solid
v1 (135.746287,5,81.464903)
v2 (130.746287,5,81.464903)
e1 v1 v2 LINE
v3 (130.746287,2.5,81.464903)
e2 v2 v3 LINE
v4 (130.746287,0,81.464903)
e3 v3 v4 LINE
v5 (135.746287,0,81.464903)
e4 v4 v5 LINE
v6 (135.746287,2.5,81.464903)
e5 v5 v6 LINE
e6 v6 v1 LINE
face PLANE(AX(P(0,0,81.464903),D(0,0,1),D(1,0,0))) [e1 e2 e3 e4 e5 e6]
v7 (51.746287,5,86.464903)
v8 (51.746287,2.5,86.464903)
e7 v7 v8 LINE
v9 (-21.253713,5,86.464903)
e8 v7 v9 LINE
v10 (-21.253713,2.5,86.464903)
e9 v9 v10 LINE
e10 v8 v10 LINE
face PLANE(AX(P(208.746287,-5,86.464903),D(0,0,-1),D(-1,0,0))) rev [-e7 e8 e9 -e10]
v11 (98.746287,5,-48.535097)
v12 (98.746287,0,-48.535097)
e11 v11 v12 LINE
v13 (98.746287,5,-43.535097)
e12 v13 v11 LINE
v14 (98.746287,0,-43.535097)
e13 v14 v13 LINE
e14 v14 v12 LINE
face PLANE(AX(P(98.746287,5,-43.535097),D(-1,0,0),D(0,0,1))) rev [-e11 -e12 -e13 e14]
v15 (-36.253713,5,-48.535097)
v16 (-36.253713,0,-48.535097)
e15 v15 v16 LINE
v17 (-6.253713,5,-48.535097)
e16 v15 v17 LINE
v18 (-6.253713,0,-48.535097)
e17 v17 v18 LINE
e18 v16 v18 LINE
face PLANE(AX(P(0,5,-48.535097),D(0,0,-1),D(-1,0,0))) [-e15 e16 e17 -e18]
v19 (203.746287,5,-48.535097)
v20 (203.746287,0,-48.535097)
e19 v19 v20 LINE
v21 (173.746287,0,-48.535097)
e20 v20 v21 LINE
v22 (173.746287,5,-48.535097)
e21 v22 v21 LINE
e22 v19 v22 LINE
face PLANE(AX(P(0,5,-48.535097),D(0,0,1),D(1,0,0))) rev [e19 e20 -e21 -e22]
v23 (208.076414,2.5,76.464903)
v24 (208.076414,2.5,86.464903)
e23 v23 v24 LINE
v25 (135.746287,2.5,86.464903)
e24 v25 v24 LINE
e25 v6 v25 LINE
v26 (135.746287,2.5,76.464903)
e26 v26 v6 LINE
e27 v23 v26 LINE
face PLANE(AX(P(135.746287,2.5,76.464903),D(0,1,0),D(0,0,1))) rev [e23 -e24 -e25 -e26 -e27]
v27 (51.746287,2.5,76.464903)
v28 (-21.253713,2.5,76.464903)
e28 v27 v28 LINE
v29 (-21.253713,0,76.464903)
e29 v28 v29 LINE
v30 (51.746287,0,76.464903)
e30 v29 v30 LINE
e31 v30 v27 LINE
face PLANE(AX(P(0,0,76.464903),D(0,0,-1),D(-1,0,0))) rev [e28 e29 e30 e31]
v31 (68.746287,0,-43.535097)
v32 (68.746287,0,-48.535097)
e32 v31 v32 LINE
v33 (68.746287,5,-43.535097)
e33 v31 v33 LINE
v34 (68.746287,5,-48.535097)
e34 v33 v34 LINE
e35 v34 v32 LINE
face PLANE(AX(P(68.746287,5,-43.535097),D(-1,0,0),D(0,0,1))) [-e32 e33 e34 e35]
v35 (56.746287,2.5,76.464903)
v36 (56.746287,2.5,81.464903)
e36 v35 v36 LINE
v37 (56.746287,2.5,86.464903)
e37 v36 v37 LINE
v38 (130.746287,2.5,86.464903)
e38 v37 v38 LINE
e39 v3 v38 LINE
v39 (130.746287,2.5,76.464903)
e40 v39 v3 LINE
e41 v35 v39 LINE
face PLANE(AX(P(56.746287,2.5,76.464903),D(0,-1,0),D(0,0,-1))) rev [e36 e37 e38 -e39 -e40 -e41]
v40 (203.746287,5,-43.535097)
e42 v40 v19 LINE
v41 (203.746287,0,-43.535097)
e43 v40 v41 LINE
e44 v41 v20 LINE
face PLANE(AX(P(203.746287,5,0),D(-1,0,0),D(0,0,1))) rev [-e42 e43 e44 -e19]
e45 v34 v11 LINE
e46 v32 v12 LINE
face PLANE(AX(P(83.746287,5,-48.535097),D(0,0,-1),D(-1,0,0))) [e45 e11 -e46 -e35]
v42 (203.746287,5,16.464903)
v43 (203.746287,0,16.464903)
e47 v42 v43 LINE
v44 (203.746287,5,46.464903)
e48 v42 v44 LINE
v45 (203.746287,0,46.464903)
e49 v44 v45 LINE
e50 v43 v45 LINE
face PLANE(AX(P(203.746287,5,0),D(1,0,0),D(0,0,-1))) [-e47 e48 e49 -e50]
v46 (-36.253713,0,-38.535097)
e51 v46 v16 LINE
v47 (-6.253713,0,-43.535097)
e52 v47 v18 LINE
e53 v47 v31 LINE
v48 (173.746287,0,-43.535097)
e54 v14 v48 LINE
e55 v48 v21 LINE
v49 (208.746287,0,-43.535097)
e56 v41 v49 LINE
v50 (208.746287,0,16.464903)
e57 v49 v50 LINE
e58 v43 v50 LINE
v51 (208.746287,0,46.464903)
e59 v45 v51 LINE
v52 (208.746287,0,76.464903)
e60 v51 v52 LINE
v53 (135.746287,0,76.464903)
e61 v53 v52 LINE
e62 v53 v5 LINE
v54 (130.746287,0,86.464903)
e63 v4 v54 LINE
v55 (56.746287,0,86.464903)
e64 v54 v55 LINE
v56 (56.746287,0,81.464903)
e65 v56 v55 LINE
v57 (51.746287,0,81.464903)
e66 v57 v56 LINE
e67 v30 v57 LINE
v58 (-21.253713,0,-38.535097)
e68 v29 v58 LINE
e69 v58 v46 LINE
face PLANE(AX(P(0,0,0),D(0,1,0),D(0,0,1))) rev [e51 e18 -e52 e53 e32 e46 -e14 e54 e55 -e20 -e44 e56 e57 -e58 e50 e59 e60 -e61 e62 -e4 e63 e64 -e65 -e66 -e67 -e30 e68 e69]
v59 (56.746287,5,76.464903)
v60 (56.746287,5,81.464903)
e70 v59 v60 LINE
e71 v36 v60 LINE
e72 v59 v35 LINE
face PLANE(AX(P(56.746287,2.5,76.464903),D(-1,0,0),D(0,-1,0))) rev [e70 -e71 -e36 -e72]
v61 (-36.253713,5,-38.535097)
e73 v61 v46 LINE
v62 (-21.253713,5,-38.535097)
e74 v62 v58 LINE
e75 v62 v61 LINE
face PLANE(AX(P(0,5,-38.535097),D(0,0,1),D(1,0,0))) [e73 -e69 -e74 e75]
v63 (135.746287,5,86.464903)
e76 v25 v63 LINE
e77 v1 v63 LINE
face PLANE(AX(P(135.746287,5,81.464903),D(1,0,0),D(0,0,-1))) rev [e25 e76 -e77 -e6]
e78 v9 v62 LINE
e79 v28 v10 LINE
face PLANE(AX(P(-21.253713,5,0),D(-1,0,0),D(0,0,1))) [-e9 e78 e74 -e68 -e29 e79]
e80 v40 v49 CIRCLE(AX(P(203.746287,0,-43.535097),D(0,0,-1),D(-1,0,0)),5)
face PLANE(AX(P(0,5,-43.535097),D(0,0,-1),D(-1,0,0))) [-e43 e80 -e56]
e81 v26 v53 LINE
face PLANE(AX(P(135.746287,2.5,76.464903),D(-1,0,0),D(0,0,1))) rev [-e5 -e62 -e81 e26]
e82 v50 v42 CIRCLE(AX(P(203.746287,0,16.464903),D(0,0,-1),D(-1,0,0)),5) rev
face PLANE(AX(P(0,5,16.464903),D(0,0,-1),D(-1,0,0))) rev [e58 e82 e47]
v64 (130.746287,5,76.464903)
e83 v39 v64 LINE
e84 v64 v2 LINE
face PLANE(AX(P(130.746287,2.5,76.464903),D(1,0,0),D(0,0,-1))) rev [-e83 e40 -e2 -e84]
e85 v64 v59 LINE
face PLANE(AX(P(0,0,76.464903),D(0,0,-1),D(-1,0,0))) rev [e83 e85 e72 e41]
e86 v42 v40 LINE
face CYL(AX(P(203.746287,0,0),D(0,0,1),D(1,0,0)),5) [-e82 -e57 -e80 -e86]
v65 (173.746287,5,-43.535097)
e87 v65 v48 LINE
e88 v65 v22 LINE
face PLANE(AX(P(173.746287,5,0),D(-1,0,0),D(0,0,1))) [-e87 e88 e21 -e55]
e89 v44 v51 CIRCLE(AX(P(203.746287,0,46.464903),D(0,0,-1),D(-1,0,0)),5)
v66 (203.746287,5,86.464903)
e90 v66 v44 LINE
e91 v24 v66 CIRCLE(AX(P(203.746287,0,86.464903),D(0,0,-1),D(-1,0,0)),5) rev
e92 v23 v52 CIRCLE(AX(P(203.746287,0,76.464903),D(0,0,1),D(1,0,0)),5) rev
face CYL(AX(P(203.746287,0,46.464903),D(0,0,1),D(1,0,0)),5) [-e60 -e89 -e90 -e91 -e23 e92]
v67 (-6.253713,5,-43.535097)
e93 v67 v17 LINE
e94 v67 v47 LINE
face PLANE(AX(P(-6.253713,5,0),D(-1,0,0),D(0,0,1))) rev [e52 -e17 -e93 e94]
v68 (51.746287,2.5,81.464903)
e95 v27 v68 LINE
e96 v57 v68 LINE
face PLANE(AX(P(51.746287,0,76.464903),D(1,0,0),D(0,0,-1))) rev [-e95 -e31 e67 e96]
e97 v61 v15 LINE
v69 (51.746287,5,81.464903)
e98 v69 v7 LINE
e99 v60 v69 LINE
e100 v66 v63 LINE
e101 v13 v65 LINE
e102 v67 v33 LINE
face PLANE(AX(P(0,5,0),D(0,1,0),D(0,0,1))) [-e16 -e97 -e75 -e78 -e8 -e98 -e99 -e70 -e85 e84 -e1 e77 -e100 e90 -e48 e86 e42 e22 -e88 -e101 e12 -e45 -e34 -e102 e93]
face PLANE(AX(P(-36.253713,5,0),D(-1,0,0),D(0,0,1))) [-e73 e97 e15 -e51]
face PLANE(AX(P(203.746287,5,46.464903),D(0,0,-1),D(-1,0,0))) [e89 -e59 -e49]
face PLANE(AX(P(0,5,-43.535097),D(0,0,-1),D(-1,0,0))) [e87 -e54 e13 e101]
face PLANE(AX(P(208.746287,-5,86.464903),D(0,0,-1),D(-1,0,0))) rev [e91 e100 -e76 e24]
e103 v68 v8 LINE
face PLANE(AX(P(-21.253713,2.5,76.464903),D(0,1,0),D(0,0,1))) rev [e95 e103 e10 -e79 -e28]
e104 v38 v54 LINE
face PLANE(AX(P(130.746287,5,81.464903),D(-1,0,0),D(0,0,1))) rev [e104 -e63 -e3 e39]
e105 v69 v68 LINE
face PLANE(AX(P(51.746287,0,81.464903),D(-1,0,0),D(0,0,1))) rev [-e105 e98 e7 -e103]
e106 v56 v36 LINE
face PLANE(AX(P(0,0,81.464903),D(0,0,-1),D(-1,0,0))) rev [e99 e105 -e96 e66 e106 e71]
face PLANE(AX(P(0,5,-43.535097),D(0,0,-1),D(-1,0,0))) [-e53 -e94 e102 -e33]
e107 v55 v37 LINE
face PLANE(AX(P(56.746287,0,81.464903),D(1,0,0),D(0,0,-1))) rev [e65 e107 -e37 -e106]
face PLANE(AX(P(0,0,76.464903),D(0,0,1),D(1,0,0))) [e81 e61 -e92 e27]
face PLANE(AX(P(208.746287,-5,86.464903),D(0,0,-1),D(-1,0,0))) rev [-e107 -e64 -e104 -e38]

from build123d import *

# Parameters (mm, degrees)
SKETCH_1_W          = 5
SKETCH_1_H          = 60
SKETCH_1_W_2        = 30
SKETCH_1_H_2        = 5
SKETCH_1_W_3        = 15
EXTRUDE_1_DEPTH     = 5
FILLET_1_R          = 5
SKETCH_2_W          = 239.490005879
SKETCH_2_H          = 213.108485662
CUT_EXTRUDE_2_DEPTH = 10
SKETCH_3_W          = 73
SKETCH_3_H          = 2.5
SKETCH_3_W_2        = 74
CUT_EXTRUDE_3_DEPTH = 10
SKETCH_4_W          = 5
SKETCH_4_H          = 5
CUT_EXTRUDE_4_DEPTH = 5


with BuildPart() as part:
    # 草圖1 → 填料-伸長1 (new body)
    with BuildSketch(Plane(origin=(0, 0, 0), x_dir=(1, 0, 0), z_dir=(0, 1, 0))):
        Polygon((198.746286718, -286.464902661), (198.746286718, -256.464902661), (183.246286718, -256.464902661), (183.246286718, -266.464902661), (124.746286718, -266.464902661), (124.746286718, -262.464902661), (109.246286718, -262.464902661), (109.246286718, -266.464902661), (-21.253713282, -266.464902661), (-21.253713282, 38.535097339), (-36.253713282, 38.535097339), (-36.253713282, 43.535097339), (203.746286718, 43.535097339), (203.746286718, -286.464902661), align=None)
        with Locations((206.246286718, -256.464902661)):
            Rectangle(SKETCH_1_W, SKETCH_1_H)
        with Locations((206.246286718, 13.535097339)):
            Rectangle(SKETCH_1_W, SKETCH_1_H)
        with Locations((188.746286718, 46.035097339)):
            Rectangle(SKETCH_1_W_2, SKETCH_1_H_2)
        with Locations((-21.253713282, 46.035097339)):
            Rectangle(SKETCH_1_W_2, SKETCH_1_H_2)
        with Locations((91.246286718, 46.035097339)):
            Rectangle(SKETCH_1_W_3, SKETCH_1_H_2)
        with Locations((76.246286718, 46.035097339)):
            Rectangle(SKETCH_1_W_3, SKETCH_1_H_2)
        with Locations((206.246286718, -166.464902661)):
            Rectangle(SKETCH_1_W, SKETCH_1_H)
        with Locations((206.246286718, -76.464902661)):
            Rectangle(SKETCH_1_W, SKETCH_1_H)
    extrude(amount=EXTRUDE_1_DEPTH)

    # 圓角1
    fillet_1_edges = [part.edges().sort_by_distance(p)[0] for p in [
        (208.746286718, 5, -13.535097339),
        (208.746286718, 5, 76.464902661),
        (208.746286718, 5, 166.464902661),
        (208.746286718, 5, 256.464902661),
    ]]
    fillet(fillet_1_edges, radius=FILLET_1_R - 0.0001)  # a hair under: the kernel refuses the full size

    # 草圖2 → 除料-伸長2 (cut)
    with BuildSketch(Plane(origin=(0, 5, 0), x_dir=(1, 0, 0), z_dir=(0, 1, 0))):
        with Locations((89.001283779, -193.019145492)):
            Rectangle(SKETCH_2_W, SKETCH_2_H)
    extrude(amount=-CUT_EXTRUDE_2_DEPTH, mode=Mode.SUBTRACT)

    # 草圖3 → 除料-伸長3 (cut)
    with BuildSketch(Plane.XY.offset(86.464902661)):
        with Locations((15.246286718, 1.25)):
            Rectangle(SKETCH_3_W, SKETCH_3_H)
        with Locations((172.246286718, 1.25)):
            Rectangle(SKETCH_3_W, SKETCH_3_H)
        with Locations((93.746286718, 3.75)):
            Rectangle(SKETCH_3_W_2, SKETCH_3_H)
    extrude(amount=-CUT_EXTRUDE_3_DEPTH, mode=Mode.SUBTRACT)

    # 草圖4 → 除料-伸長4 (cut)
    with BuildSketch(Plane.XY.offset(86.464902661)):
        with Locations((54.246286718, 2.5)):
            Rectangle(SKETCH_4_W, SKETCH_4_H)
        with Locations((133.246286718, 2.5)):
            Rectangle(SKETCH_4_W, SKETCH_4_H)
    extrude(amount=-CUT_EXTRUDE_4_DEPTH, mode=Mode.SUBTRACT)


solid = part.part
